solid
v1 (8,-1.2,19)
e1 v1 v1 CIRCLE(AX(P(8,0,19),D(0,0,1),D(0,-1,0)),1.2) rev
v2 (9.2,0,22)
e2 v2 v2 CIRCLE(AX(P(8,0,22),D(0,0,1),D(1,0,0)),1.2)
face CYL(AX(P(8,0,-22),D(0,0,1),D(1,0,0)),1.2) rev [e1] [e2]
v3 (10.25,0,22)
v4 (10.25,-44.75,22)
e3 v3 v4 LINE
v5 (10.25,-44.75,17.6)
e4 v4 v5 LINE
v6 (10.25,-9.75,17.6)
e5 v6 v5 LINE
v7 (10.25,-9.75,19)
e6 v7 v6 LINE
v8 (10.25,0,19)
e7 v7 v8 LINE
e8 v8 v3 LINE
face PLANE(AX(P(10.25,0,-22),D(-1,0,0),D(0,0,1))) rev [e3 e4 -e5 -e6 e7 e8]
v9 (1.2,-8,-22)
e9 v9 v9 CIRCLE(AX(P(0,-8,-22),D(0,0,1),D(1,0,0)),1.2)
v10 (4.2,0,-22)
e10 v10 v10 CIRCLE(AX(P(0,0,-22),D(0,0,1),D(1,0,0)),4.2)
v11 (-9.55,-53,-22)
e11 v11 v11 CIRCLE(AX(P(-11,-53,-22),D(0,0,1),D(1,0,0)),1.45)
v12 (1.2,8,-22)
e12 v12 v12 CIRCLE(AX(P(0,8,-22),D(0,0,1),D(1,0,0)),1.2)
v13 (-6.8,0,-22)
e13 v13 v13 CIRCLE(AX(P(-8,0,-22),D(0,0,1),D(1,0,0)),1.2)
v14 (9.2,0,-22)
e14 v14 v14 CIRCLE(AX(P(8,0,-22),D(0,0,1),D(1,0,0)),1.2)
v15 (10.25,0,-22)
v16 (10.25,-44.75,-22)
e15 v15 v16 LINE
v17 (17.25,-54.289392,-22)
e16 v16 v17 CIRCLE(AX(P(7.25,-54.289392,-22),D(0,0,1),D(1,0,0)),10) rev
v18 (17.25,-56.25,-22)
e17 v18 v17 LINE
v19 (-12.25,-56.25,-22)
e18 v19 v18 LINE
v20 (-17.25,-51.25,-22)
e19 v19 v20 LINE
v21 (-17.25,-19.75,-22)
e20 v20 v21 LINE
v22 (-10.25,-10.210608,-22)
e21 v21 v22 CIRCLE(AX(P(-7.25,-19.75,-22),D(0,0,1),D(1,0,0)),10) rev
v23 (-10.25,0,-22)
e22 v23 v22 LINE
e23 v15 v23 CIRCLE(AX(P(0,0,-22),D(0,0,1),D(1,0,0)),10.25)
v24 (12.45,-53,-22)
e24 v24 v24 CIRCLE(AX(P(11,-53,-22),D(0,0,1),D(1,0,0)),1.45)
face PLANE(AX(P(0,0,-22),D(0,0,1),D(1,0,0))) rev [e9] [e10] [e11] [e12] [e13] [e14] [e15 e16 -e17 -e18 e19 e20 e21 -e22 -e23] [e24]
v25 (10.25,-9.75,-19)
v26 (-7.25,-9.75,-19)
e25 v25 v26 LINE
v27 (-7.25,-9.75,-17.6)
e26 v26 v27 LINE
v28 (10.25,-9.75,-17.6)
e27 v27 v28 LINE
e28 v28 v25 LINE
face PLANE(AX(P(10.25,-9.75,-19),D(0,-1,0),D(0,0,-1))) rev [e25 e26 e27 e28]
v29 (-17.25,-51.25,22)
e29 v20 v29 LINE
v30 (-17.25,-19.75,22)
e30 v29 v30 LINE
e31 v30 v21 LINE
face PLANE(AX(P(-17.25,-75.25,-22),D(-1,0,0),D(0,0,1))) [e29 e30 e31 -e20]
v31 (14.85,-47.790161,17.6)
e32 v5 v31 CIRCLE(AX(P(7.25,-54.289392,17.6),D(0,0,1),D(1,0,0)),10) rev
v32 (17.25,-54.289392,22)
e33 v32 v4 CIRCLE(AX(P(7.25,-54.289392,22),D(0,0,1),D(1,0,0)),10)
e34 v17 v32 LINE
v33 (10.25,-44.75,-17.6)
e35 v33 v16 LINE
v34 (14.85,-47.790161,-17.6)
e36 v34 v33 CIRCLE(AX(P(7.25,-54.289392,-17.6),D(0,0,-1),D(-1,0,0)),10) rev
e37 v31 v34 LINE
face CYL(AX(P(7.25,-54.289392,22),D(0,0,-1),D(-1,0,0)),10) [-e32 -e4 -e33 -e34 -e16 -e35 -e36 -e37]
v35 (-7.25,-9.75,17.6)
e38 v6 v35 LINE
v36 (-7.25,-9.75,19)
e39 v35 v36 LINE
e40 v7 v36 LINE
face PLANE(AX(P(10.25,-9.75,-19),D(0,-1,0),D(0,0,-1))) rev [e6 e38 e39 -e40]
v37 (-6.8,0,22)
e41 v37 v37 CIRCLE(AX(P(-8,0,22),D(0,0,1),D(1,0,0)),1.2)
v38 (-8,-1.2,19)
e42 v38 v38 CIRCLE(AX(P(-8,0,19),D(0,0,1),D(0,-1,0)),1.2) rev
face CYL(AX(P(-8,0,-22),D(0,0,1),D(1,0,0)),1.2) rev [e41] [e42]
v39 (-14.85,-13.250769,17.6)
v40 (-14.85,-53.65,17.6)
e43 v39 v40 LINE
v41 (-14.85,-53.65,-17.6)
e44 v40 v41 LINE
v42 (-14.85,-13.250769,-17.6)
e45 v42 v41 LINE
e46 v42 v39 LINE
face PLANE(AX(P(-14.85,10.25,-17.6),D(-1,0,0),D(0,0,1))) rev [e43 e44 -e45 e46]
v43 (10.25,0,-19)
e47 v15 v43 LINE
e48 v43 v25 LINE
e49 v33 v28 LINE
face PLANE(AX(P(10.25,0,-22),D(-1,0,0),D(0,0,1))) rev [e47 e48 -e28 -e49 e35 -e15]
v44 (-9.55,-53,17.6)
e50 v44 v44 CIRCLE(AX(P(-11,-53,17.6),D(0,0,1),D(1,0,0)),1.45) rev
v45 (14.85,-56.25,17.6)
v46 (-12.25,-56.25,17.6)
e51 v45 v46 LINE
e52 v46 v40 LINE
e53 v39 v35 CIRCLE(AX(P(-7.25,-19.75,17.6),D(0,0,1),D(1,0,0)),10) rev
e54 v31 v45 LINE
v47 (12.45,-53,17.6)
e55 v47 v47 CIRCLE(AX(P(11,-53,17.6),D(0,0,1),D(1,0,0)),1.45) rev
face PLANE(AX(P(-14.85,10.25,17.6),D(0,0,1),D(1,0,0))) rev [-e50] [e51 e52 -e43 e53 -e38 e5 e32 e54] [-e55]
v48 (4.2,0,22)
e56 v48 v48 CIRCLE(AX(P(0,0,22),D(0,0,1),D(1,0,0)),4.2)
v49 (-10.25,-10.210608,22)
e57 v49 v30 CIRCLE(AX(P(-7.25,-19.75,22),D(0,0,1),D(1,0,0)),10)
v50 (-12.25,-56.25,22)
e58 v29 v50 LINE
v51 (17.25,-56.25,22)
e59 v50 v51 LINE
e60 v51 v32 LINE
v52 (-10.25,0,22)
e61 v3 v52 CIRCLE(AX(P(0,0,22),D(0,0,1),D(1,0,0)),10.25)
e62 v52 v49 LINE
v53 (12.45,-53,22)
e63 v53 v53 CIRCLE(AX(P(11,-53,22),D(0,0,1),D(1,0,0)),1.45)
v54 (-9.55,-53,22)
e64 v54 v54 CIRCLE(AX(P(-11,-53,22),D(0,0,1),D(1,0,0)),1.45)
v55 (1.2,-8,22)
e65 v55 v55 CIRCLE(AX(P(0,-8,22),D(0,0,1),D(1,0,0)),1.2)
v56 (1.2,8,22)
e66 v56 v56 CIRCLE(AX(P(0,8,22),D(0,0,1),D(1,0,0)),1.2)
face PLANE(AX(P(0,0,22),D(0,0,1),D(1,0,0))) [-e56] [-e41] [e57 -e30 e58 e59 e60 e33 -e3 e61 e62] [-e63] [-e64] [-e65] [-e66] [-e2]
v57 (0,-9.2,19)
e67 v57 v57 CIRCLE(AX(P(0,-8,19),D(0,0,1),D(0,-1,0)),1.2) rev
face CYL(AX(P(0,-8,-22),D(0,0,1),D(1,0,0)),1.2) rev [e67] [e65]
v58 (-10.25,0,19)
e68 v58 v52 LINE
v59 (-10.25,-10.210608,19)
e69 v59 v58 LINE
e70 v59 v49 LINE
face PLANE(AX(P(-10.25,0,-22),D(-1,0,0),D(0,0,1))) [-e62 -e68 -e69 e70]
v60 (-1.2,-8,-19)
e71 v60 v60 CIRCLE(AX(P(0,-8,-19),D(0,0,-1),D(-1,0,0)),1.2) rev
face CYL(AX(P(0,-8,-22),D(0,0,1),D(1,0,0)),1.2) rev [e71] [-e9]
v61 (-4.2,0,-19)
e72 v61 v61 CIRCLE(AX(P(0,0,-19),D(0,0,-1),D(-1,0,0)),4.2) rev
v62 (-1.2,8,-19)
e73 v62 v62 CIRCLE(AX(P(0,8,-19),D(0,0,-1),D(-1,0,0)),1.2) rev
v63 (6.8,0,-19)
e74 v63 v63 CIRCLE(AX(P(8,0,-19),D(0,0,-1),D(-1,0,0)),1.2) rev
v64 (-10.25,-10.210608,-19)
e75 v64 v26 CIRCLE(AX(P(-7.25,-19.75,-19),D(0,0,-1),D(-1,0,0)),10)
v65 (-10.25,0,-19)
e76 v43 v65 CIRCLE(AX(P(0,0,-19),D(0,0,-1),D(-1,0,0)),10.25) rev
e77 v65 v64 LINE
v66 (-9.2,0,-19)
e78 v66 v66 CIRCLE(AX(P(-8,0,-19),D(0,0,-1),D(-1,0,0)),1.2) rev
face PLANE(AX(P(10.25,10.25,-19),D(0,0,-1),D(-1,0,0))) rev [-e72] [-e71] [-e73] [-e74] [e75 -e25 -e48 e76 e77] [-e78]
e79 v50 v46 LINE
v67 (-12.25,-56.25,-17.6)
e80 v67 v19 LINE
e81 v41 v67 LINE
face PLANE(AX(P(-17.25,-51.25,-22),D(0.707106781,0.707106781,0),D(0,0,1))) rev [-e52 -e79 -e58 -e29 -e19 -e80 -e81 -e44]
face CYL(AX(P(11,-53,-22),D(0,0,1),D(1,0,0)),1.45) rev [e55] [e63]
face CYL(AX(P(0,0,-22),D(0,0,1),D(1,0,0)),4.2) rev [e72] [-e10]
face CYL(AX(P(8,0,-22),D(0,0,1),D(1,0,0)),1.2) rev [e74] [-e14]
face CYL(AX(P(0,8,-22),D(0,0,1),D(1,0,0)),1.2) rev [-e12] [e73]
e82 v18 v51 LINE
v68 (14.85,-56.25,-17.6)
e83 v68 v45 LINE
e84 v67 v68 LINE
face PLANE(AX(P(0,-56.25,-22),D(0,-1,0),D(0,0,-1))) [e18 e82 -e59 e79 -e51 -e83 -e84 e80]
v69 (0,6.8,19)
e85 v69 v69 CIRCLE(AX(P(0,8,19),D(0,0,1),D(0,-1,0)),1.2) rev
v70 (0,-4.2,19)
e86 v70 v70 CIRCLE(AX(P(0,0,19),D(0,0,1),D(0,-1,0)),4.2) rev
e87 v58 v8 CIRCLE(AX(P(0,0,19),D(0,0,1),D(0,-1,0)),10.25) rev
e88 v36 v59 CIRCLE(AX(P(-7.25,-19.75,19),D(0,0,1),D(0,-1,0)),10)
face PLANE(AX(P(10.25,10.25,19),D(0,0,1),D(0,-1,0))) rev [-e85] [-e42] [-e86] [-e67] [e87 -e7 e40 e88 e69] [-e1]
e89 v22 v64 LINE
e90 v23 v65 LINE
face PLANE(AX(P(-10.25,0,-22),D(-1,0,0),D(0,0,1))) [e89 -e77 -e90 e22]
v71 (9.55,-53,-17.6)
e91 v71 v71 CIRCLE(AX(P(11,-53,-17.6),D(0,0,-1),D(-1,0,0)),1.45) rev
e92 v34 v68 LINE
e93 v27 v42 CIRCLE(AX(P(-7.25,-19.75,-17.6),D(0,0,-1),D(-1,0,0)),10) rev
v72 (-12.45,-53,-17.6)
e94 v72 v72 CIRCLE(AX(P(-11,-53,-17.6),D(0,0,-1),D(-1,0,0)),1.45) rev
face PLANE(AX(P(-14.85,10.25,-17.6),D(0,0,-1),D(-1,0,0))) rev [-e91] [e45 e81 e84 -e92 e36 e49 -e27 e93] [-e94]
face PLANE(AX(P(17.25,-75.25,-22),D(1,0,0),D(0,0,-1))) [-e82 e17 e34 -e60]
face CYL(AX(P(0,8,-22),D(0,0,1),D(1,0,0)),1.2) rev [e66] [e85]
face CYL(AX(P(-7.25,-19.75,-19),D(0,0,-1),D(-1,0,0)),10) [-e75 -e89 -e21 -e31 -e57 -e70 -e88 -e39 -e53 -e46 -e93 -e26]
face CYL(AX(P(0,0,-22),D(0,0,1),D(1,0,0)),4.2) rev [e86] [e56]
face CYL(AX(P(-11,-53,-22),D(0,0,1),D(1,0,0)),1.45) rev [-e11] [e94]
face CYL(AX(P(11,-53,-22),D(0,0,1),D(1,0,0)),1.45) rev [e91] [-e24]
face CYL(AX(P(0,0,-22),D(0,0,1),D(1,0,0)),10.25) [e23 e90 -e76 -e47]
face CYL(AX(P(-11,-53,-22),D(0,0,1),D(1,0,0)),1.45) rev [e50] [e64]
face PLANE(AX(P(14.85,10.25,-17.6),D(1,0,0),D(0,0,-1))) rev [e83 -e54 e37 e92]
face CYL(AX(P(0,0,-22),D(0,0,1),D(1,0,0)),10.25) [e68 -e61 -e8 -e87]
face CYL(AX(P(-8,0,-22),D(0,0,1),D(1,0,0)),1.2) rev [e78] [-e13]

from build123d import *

# Parameters (mm, degrees)
BOSS_EXTRUDE1_DEPTH      = 22
BOSS_EXTRUDE1_DEPTH_BACK = 22
SKETCH2_W                = 38
SKETCH2_H                = 20
CUT_EXTRUDE1_DEPTH       = 105.423416914
SKETCH3_W                = 7
SKETCH3_H                = 44
BOSS_EXTRUDE2_DEPTH      = 65.5
SKETCH23_R               = 5
SKETCH23_R_2             = 1.2
CUT_EXTRUDE2_DEPTH       = 111.605436123
SKETCH24_W               = 28.5
SKETCH24_H               = 34
CUT_EXTRUDE3_DEPTH       = 90.954502389
SKETCH26_R               = 1.2
SKETCH26_R_2             = 5
SKETCH26_R_3             = 1.45
CUT_EXTRUDE6_DEPTH       = 107.330263801
SKETCH27_W               = 29.7
SKETCH27_H               = 35.2
CUT_EXTRUDE8_DEPTH       = 73.137455597
SKETCH29_W               = 7
SKETCH29_H               = 35
CUT_EXTRUDE10_DEPTH      = 74.468530678
CHAMFER2_SIZE            = 5
FILLET1_START            = -23
FILLET1_DEPTH            = 46
FILLET2_R                = 10


with BuildPart() as part:
    # Sketch1 → Boss-Extrude1 (new, two sides: drawn at the far end of the back side and taken through both)
    with BuildSketch(Plane.XY.offset(-BOSS_EXTRUDE1_DEPTH_BACK)):
        with BuildLine():
            Line((10.25, -60), (10.25, 0))
            ThreePointArc((10.25, 0), (0, -10.25), (-10.25, 0))
            Line((-10.25, 0), (-10.25, -60))
            Line((-10.25, -60), (-10.25, -100))
            Line((-10.25, -100), (10.25, -100))
            Line((10.25, -100), (10.25, -60))
        make_face()
        with BuildLine():
            Line((10.25, 0), (9.2, 0))
            ThreePointArc((9.2, 0), (8.816088231, -0.879772698), (7.91, -1.196620241))
            ThreePointArc((7.91, -1.196620241), (5.656854249, -5.656854249), (1.196620241, -7.91))
            ThreePointArc((1.196620241, -7.91), (1.199154762, -7.954968281), (1.2, -8))
            ThreePointArc((1.2, -8), (-0.045031719, -9.199154762), (-1.196620241, -7.91))
            ThreePointArc((-1.196620241, -7.91), (-5.656854249, -5.656854249), (-7.91, -1.196620241))
            ThreePointArc((-7.91, -1.196620241), (-8.816088231, -0.879772698), (-9.2, 0))
            Line((-9.2, 0), (-10.25, 0))
            ThreePointArc((-10.25, 0), (0, -10.25), (10.25, 0))
        make_face()
        with BuildLine():
            ThreePointArc((7.91, -1.196620241), (7.120227302, -0.816088231), (6.8, 0))
            Line((6.8, 0), (4.2, 0))
            ThreePointArc((4.2, 0), (0, -4.2), (-4.2, 0))
            Line((-4.2, 0), (-6.8, 0))
            ThreePointArc((-6.8, 0), (-7.120227302, -0.816088231), (-7.91, -1.196620241))
            ThreePointArc((-7.91, -1.196620241), (-5.656854249, -5.656854249), (-1.196620241, -7.91))
            ThreePointArc((-1.196620241, -7.91), (0, -6.8), (1.196620241, -7.91))
            ThreePointArc((1.196620241, -7.91), (5.656854249, -5.656854249), (7.91, -1.196620241))
        make_face()
        with BuildLine():
            Line((4.2, 0), (6.8, 0))
            ThreePointArc((6.8, 0), (7.120227302, 0.816088231), (7.91, 1.196620241))
            ThreePointArc((7.91, 1.196620241), (5.656854249, 5.656854249), (1.196620241, 7.91))
            ThreePointArc((1.196620241, 7.91), (0, 6.8), (-1.196620241, 7.91))
            ThreePointArc((-1.196620241, 7.91), (-5.656854249, 5.656854249), (-7.91, 1.196620241))
            ThreePointArc((-7.91, 1.196620241), (-7.120227302, 0.816088231), (-6.8, 0))
            Line((-6.8, 0), (-4.2, 0))
            ThreePointArc((-4.2, 0), (0, 4.2), (4.2, 0))
        make_face()
        with BuildLine():
            ThreePointArc((7.91, 1.196620241), (8.816088231, 0.879772698), (9.2, 0))
            Line((9.2, 0), (10.25, 0))
            ThreePointArc((10.25, 0), (0, 10.25), (-10.25, 0))
            Line((-10.25, 0), (-9.2, 0))
            ThreePointArc((-9.2, 0), (-8.816088231, 0.879772698), (-7.91, 1.196620241))
            ThreePointArc((-7.91, 1.196620241), (-5.656854249, 5.656854249), (-1.196620241, 7.91))
            ThreePointArc((-1.196620241, 7.91), (-0.045031719, 9.199154762), (1.2, 8))
            ThreePointArc((1.2, 8), (1.199154762, 7.954968281), (1.196620241, 7.91))
            ThreePointArc((1.196620241, 7.91), (5.656854249, 5.656854249), (7.91, 1.196620241))
        make_face()
    extrude(amount=BOSS_EXTRUDE1_DEPTH + BOSS_EXTRUDE1_DEPTH_BACK)

    # Sketch2 → Cut-Extrude1 (cut, through all)
    with BuildSketch(Plane.ZY.offset(10.25)):
        with Locations((0, 0.25)):
            Rectangle(SKETCH2_W, SKETCH2_H)
    extrude(amount=-CUT_EXTRUDE1_DEPTH, mode=Mode.SUBTRACT)

    # Sketch3 → Boss-Extrude2 (add)
    with BuildSketch(Plane(origin=(0, -9.75, 0), x_dir=(1, 0, 0), z_dir=(0, 1, 0))):
        with Locations((-13.75, 0)):
            Rectangle(SKETCH3_W, SKETCH3_H)
        with Locations((13.75, 0)):
            Rectangle(SKETCH3_W, SKETCH3_H)
    extrude(amount=-BOSS_EXTRUDE2_DEPTH)

    # Sketch23 → Cut-Extrude2 (cut, through all)
    with BuildSketch(Plane.XY.offset(22)):
        with BuildLine():
            Line((-10.25, -100), (10.25, -100))
            Line((10.25, -100), (10.25, -85))
            ThreePointArc((10.25, -85), (0, -95.25), (-10.25, -85))
            Line((-10.25, -85), (-10.25, -100))
        make_face()
        with Locations((0, -85)):
            Circle(SKETCH23_R)
        with Locations((8, -85)):
            Circle(SKETCH23_R_2)
        with Locations((0, -77)):
            Circle(SKETCH23_R_2)
        with Locations((0, -93)):
            Circle(SKETCH23_R_2)
        with Locations((-8, -85)):
            Circle(SKETCH23_R_2)
    extrude(amount=-CUT_EXTRUDE2_DEPTH, mode=Mode.SUBTRACT)

    # Sketch24 → Cut-Extrude3 (cut, through all)
    with BuildSketch(Plane(origin=(0, -9.75, 0), x_dir=(1, 0, 0), z_dir=(0, 1, 0))):
        Rectangle(SKETCH24_W, SKETCH24_H)
    extrude(amount=-CUT_EXTRUDE3_DEPTH, mode=Mode.SUBTRACT)

    # Sketch26 → Cut-Extrude6 (cut, through all)
    # profile 1 of 5: a face of its own
    with BuildSketch(Plane.XY.offset(22)):
        with BuildLine():
            Line((10.25, -75.25), (14.25, -75.25))
            Line((14.25, -75.25), (14.25, -56.53282359))
            Line((14.25, -56.53282359), (14.25, -56.25))
            Line((14.25, -56.25), (-14.25, -56.25))
            Line((-14.25, -56.25), (-14.25, -56.53282359))
            Line((-14.25, -56.53282359), (-14.25, -75.25))
            Line((-14.25, -75.25), (-10.25, -75.25))
            Line((-10.25, -75.25), (-10.25, -85))
            ThreePointArc((-10.25, -85), (0, -95.25), (10.25, -85))
            Line((10.25, -85), (10.25, -75.25))
        make_face()
        with Locations((-8, -85)):
            Circle(SKETCH26_R, mode=Mode.SUBTRACT)
        with Locations((0, -85)):
            Circle(SKETCH26_R_2, mode=Mode.SUBTRACT)
        with Locations((0, -77)):
            Circle(SKETCH26_R, mode=Mode.SUBTRACT)
        with Locations((0, -93)):
            Circle(SKETCH26_R, mode=Mode.SUBTRACT)
        with Locations((8, -85)):
            Circle(SKETCH26_R, mode=Mode.SUBTRACT)
    # profile 2 of 5: a face of its own
    with BuildSketch(Plane.XY.offset(22)):
        Polygon((-17.25, -75.25), (-14.25, -75.25), (-14.25, -56.53282359), (-14.25, -56.25), (-17.25, -56.25), align=None)
    # profile 3 of 5: a face of its own
    with BuildSketch(Plane.XY.offset(22)):
        Polygon((14.25, -56.53282359), (14.25, -75.25), (17.25, -75.25), (17.25, -56.25), (14.25, -56.25), align=None)
    # profile 4 of 5: a face of its own
    with BuildSketch(Plane.XY.offset(22)):
        with Locations((-11, -53)):
            Circle(SKETCH26_R_3)
    # profile 5 of 5: a face of its own
    with BuildSketch(Plane.XY.offset(22)):
        with Locations((11, -53)):
            Circle(SKETCH26_R_3)
    extrude(amount=-CUT_EXTRUDE6_DEPTH, mode=Mode.SUBTRACT)

    # Sketch27 → Cut-Extrude8 (cut, through all)
    with BuildSketch(Plane.XZ.offset(56.25)):
        Rectangle(SKETCH27_W, SKETCH27_H)
    extrude(amount=-CUT_EXTRUDE8_DEPTH, mode=Mode.SUBTRACT)

    # Sketch29 → Cut-Extrude10 (cut, through all)
    with BuildSketch(Plane(origin=(0, 0, -22), x_dir=(-1, 0, 0), z_dir=(0, 0, -1))):
        with Locations((-13.75, -27.25)):
            Rectangle(SKETCH29_W, SKETCH29_H)
    extrude(amount=-CUT_EXTRUDE10_DEPTH, mode=Mode.SUBTRACT)

    # Chamfer2
    # the kernel refuses this chamfer: 5 mm, written as the material it takes off along each edge
    with BuildSketch(Plane(origin=(-17.25, -56.25, 34.85841494), x_dir=(1, 0, 0), z_dir=(0, 0, -1))) as chamfer2_piece_1:
        Polygon((CHAMFER2_SIZE, 0), (0, -CHAMFER2_SIZE), (0, 0), align=None)
    extrude(amount=69.71682988, mode=Mode.SUBTRACT)

    # Fillet1: read off the stored shape, not the designer's step
    # Fillet1 outline → Fillet1 (cut)
    with BuildSketch(Plane.XY.offset(FILLET1_START)):
        with BuildLine():
            ThreePointArc((10.25, -44.75), (15.312257748, -48.373312231), (17.25, -54.289392014))
            Line((17.25, -54.289392014), (17.25, -44.75))
            Line((17.25, -44.75), (10.25, -44.75))
        make_face()
    extrude(amount=FILLET1_DEPTH, mode=Mode.SUBTRACT)

    # Fillet2
    # the kernel refuses this fillet: 10 mm, written as the material it takes off along each edge
    with BuildSketch(Plane(origin=(-17.25, -9.75, -47), x_dir=(1, 0, 0), z_dir=(0, 0, 1))) as fillet2_piece_1_section:
        with BuildLine():
            CenterArc((FILLET2_R, -FILLET2_R), FILLET2_R, 90, 90)
            Line((0, -FILLET2_R), (0, 0))
            Line((0, 0), (FILLET2_R, 0))
        make_face()
    fillet2_piece_1 = extrude(amount=94, mode=Mode.PRIVATE)
    fillet2_piece_1 = split(fillet2_piece_1, bisect_by=Plane(origin=(-10.25, -9.75, -47), z_dir=(-1, 0, 0)), keep=Keep.TOP, mode=Mode.PRIVATE)
    add(fillet2_piece_1, mode=Mode.SUBTRACT)
    with BuildSketch(Plane(origin=(-17.25, -9.75, -47), x_dir=(1, 0, 0), z_dir=(0, 0, 1))) as fillet2_piece_2_section:
        with BuildLine():
            CenterArc((FILLET2_R, -FILLET2_R), FILLET2_R, 90, 90)
            Line((0, -FILLET2_R), (0, 0))
            Line((0, 0), (FILLET2_R, 0))
        make_face()
    fillet2_piece_2 = extrude(amount=94, mode=Mode.PRIVATE)
    fillet2_piece_2 = split(fillet2_piece_2, bisect_by=Plane(origin=(-17.25, -9.75, -19), z_dir=(0, 0, 1)), keep=Keep.TOP, mode=Mode.PRIVATE)
    fillet2_piece_2 = split(fillet2_piece_2, bisect_by=Plane(origin=(-17.25, -9.75, 19), z_dir=(0, 0, -1)), keep=Keep.TOP, mode=Mode.PRIVATE)
    add(fillet2_piece_2, mode=Mode.SUBTRACT)


solid = part.part
